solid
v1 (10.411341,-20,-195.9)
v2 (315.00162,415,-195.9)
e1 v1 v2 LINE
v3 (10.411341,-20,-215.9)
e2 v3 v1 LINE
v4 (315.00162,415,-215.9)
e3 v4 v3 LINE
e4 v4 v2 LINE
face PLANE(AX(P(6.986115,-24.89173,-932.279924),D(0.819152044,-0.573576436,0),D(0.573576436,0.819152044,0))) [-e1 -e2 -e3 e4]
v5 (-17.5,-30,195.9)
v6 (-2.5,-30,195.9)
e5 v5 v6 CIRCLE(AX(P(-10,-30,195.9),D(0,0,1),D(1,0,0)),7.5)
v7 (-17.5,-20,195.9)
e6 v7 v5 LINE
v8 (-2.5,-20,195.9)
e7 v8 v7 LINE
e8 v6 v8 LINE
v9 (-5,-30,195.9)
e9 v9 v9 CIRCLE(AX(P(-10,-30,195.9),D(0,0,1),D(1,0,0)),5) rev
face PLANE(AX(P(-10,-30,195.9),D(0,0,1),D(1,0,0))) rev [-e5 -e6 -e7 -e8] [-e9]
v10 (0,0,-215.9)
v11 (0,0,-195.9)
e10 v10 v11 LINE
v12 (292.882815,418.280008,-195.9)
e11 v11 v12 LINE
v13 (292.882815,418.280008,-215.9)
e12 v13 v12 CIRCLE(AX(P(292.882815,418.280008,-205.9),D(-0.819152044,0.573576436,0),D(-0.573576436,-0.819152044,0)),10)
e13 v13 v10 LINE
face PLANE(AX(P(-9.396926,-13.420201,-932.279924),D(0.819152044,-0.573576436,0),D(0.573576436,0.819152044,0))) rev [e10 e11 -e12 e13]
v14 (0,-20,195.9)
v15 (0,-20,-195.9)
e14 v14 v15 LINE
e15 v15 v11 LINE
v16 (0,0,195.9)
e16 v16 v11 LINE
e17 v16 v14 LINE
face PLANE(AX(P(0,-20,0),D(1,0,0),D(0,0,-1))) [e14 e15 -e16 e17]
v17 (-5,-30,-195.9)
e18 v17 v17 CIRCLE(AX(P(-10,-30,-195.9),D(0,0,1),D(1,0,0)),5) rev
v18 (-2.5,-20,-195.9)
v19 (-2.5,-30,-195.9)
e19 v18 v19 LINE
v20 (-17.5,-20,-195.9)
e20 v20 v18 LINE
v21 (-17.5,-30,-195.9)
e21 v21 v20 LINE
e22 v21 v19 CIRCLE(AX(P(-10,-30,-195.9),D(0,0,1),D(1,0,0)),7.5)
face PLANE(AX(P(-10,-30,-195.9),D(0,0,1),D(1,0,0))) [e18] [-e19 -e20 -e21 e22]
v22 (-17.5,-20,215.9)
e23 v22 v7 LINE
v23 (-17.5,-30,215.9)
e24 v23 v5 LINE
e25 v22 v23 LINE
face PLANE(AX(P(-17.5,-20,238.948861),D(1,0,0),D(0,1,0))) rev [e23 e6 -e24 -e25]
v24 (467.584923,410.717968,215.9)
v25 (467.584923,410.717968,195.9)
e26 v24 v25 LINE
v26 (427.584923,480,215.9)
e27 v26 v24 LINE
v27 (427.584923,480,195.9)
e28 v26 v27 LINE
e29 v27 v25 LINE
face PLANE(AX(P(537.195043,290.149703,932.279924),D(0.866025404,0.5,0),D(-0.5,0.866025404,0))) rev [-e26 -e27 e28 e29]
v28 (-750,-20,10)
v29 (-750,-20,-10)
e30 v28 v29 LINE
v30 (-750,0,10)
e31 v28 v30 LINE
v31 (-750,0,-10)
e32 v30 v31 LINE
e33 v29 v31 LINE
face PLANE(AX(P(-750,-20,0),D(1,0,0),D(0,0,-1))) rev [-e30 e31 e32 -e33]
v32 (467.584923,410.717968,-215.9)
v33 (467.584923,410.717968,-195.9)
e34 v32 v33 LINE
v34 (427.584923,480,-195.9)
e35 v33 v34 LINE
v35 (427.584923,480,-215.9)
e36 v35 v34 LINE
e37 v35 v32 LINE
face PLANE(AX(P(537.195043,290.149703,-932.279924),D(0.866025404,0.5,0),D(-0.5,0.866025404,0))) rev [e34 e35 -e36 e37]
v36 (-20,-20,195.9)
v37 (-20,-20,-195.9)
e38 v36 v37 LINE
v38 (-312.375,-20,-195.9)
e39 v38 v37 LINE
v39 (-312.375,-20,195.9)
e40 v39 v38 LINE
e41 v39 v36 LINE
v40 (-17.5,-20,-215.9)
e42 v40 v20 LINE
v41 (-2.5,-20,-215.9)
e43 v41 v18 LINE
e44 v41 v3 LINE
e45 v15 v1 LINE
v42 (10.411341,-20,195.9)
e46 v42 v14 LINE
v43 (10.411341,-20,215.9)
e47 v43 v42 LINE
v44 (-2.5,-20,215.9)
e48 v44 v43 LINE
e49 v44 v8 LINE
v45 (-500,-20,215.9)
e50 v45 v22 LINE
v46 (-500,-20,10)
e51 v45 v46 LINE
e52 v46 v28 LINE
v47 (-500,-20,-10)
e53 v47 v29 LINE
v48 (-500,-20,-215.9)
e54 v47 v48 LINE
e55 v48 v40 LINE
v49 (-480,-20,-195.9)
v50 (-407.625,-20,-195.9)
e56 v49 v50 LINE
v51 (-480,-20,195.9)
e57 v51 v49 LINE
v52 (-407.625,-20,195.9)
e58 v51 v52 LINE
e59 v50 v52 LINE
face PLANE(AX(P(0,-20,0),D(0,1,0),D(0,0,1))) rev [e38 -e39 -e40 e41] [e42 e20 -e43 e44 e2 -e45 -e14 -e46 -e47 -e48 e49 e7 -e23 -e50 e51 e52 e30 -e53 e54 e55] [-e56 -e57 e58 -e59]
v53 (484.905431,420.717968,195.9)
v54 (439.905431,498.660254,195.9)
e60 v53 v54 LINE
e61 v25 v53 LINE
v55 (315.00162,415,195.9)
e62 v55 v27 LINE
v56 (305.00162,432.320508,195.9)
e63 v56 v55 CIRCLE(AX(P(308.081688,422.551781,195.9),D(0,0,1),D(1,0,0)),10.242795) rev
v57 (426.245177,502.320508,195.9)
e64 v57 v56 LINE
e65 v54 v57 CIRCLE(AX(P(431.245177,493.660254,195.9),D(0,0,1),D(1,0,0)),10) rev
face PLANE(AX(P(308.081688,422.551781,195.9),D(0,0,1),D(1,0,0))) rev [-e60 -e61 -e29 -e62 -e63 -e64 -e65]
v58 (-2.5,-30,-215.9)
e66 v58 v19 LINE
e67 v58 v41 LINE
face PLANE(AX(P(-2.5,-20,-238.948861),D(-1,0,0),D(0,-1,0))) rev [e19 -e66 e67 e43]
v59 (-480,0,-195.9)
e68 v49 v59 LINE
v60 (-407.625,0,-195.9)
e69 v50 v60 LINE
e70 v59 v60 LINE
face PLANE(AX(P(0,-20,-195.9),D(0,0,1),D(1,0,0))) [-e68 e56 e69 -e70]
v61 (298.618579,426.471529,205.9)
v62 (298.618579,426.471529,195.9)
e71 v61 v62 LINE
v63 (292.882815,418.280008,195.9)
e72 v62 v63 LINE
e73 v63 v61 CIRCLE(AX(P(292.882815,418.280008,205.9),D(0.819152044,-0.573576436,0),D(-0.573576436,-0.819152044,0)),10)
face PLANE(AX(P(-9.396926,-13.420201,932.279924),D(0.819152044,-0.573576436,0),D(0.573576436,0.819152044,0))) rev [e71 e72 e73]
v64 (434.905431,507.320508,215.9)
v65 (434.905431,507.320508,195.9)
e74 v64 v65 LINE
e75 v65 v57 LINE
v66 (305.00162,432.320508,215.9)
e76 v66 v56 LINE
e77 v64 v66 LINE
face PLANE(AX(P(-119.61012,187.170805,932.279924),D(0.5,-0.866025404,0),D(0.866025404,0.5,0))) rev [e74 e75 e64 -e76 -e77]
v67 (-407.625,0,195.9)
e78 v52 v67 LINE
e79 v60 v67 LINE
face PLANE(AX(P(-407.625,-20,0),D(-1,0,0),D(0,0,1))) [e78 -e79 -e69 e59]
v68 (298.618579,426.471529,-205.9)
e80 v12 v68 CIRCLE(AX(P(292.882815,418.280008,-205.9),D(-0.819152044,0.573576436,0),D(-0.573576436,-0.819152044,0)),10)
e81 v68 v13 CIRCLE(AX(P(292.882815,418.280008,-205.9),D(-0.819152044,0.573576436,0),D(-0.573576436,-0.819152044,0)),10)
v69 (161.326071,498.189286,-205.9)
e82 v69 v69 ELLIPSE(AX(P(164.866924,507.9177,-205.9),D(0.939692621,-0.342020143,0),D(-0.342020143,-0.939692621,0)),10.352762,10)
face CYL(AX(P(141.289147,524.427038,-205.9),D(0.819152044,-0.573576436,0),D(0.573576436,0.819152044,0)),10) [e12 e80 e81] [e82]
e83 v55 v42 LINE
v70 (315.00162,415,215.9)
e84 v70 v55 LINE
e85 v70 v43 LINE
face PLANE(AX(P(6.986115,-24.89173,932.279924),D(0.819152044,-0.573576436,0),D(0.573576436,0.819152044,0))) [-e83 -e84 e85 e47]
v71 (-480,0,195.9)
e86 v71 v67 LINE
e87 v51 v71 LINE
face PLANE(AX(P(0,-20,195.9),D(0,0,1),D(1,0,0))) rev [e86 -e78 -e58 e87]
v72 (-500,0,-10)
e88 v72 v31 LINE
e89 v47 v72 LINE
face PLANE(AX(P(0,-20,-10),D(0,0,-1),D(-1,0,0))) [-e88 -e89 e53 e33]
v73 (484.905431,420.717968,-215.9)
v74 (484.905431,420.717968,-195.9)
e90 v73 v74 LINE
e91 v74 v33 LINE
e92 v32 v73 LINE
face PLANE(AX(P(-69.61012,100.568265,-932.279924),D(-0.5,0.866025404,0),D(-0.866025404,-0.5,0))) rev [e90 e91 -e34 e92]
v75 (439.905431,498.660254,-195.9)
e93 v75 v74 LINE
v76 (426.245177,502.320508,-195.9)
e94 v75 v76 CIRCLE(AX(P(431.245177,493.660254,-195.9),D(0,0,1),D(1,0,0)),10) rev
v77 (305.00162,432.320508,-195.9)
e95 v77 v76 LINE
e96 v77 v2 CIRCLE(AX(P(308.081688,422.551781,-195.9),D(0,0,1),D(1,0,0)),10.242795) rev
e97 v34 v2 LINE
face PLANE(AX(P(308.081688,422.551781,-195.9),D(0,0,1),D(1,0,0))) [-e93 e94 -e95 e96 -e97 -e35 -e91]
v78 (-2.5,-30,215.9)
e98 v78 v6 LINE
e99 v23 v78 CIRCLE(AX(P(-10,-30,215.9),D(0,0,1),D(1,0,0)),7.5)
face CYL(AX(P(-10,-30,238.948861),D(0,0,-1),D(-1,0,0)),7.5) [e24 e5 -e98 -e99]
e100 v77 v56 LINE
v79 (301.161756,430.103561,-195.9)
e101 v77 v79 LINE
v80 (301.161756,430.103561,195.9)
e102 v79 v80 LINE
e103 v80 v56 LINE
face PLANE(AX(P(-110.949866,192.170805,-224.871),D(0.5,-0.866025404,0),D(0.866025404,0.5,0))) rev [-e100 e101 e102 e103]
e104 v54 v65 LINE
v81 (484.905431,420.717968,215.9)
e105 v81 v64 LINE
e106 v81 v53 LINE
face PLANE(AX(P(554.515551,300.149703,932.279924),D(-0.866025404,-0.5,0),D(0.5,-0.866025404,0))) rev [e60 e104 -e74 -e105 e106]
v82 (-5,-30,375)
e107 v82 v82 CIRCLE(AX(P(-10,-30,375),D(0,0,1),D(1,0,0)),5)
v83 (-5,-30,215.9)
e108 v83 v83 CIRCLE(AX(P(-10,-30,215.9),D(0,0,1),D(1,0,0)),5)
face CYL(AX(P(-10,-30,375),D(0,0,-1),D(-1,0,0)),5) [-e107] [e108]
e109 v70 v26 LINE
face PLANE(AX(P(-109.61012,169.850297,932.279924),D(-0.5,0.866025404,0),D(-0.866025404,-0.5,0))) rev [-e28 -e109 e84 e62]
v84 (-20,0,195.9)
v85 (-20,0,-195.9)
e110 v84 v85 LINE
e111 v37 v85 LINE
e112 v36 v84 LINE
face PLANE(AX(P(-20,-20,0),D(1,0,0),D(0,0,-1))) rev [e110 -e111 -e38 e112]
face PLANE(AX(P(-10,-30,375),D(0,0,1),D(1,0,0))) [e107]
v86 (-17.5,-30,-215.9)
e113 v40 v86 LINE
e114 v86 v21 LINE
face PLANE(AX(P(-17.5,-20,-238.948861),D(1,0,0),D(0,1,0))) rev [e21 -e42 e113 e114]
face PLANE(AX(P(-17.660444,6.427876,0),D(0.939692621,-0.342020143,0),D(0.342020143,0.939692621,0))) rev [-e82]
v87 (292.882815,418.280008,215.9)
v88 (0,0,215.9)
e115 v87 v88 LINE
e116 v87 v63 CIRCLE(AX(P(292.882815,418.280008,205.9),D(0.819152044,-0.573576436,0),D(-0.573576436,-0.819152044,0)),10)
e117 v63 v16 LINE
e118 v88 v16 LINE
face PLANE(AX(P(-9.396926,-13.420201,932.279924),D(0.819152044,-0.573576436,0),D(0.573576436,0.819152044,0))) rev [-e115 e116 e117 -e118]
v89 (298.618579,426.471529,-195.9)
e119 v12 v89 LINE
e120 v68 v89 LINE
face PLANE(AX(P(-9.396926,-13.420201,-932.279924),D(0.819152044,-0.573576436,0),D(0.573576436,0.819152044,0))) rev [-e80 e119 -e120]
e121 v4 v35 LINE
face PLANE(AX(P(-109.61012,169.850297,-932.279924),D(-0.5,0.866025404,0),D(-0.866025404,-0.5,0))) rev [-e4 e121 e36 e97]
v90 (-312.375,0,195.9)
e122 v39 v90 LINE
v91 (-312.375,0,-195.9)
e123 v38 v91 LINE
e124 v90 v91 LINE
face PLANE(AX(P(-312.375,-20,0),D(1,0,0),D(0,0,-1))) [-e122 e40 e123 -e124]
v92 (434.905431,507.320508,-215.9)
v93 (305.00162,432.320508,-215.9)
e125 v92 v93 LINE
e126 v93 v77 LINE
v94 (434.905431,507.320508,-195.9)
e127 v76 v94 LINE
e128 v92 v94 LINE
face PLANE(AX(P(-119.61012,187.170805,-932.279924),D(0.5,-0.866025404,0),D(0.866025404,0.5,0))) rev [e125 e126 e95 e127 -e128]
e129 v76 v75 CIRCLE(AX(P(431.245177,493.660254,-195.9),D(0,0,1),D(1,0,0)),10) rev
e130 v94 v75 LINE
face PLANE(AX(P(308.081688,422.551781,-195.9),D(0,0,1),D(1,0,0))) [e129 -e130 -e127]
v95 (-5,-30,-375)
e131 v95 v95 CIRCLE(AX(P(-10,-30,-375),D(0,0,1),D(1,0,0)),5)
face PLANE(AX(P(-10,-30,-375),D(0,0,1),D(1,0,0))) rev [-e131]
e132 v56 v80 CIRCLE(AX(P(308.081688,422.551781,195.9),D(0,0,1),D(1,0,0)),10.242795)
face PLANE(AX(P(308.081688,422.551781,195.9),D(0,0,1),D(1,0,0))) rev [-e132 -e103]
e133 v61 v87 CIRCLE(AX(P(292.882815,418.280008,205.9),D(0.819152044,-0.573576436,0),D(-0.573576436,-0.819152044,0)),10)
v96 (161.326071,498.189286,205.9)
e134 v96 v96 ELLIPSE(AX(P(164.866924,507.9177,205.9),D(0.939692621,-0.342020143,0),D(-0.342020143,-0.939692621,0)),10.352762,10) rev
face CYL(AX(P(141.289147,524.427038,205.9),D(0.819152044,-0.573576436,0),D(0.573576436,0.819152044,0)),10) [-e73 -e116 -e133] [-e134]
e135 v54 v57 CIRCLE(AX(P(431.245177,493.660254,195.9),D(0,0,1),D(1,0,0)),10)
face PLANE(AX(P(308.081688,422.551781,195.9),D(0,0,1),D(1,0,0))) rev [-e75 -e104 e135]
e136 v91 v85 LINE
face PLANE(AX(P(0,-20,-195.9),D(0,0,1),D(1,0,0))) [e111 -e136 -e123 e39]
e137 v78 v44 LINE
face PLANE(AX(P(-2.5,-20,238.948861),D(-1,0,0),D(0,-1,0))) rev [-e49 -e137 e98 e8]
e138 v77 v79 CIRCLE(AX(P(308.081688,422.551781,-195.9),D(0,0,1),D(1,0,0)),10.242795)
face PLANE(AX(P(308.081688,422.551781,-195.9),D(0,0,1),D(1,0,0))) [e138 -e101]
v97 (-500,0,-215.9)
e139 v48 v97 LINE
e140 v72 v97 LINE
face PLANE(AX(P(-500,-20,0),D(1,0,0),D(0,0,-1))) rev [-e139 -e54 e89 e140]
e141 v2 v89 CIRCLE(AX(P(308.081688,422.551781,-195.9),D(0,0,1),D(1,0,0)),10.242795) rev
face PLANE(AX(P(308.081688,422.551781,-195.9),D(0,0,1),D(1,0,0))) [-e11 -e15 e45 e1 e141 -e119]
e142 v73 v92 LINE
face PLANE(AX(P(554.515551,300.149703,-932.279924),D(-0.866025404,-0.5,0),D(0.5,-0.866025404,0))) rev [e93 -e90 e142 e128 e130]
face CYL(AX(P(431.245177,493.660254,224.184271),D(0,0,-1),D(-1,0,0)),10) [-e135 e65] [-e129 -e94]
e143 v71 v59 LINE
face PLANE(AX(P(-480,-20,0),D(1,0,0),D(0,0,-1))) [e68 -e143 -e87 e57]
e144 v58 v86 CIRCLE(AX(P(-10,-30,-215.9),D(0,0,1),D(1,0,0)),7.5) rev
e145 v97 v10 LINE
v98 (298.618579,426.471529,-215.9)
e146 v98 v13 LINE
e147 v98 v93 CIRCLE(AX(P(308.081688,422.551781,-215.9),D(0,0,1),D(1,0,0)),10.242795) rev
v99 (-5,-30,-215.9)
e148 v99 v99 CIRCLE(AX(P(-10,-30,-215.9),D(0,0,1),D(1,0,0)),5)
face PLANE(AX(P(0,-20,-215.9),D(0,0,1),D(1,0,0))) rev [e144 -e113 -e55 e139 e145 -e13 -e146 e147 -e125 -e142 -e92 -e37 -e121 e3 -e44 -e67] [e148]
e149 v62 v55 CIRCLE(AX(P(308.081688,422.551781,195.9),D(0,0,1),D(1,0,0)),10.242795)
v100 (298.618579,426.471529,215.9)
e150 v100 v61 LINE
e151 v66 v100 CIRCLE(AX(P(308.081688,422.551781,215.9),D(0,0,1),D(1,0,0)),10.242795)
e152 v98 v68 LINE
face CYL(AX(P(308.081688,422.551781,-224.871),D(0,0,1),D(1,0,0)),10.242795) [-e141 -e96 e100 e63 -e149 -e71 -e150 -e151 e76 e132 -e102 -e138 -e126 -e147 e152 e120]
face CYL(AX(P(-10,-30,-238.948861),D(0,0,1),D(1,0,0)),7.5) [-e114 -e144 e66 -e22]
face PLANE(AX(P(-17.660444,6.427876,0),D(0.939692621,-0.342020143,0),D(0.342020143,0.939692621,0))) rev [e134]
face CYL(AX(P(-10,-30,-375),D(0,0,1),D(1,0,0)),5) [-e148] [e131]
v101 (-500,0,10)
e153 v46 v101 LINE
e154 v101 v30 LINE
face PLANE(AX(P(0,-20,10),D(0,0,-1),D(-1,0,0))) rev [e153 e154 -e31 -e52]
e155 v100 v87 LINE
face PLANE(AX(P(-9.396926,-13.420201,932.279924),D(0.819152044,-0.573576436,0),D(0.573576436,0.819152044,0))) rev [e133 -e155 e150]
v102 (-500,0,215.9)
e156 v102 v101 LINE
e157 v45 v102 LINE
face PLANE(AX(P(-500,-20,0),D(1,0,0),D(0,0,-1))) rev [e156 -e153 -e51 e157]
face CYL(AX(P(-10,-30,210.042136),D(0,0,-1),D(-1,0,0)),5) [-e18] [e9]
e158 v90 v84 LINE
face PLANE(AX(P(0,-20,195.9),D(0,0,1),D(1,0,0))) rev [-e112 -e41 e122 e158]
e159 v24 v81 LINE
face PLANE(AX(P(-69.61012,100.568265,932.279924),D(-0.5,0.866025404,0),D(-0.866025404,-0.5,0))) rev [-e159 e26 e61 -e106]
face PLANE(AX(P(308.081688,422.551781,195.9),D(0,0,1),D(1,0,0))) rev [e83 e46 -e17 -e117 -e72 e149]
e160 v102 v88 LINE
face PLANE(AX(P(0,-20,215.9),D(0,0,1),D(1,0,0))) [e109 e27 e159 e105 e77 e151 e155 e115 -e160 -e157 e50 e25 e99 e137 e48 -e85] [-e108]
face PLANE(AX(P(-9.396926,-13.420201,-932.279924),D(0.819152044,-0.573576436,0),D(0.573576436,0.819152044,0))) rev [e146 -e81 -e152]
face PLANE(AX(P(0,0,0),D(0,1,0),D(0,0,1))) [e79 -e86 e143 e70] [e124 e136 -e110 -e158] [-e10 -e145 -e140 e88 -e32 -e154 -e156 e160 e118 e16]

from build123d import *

# Parameters (mm, degrees)
SKETCH6_W                       = 500
SKETCH6_H                       = 431.8
SKETCH6_W_2                     = 460
SKETCH6_H_2                     = 391.8
SKETCH6_W_3                     = 95.25
SKETCH6_W_4                     = 250
SKETCH6_H_3                     = 20
BOSS_EXTRUDE2_DEPTH             = 20
BOSS_EXTRUDE6_START             = -195.9
SKETCH8_R                       = 5
BOSS_EXTRUDE6_DEPTH             = 20
BOSS_EXTRUDE7_START             = 215.9
SKETCH8_6_R                     = 5
BOSS_EXTRUDE7_DEPTH             = 20
BOSS_EXTRUDE8_REACH             = 783.357
SKETCH8_7_R                     = 5
BOSS_EXTRUDE8_DIRECTION_2_REACH = 783.357
BOSS_EXTRUDE9_START             = -195.9
BOSS_EXTRUDE9_DEPTH             = 20
BOSS_EXTRUDE10_START            = 195.9
BOSS_EXTRUDE10_DEPTH            = 20
BOSS_EXTRUDE11_START            = 179.1
SKETCH8_8_R                     = 5
BOSS_EXTRUDE11_DEPTH            = 195.9
BOSS_EXTRUDE12_START            = -375
SKETCH8_9_R                     = 5
BOSS_EXTRUDE12_DEPTH            = 195.9
BOSS_EXTRUDE13_START            = -195.9
BOSS_EXTRUDE13_DEPTH            = 391.8
BOSS_EXTRUDE14_START            = -195.9
BOSS_EXTRUDE14_DEPTH            = 391.8
BOSS_EXTRUDE15_START            = -195.9
SKETCH9_6_R                     = 10
BOSS_EXTRUDE15_DEPTH            = 391.8
BOSS_EXTRUDE16_REACH            = 982.051
SKETCH10_R                      = 10


# Read off the part's stored shape, not the designer's step: Boss-Extrude10, Boss-Extrude14
with BuildPart() as part:
    # Sketch6 → Boss-Extrude2 (new body)
    # profile 1 of 3: a face of its own
    with BuildSketch(Plane(origin=(0, 0, 0), x_dir=(1, 0, 0), z_dir=(0, 1, 0))):
        with Locations((-250, 0)):
            Rectangle(SKETCH6_W, SKETCH6_H)
        with Locations((-250, 0)):
            Rectangle(SKETCH6_W_2, SKETCH6_H_2, mode=Mode.SUBTRACT)
    # profile 2 of 3: a face of its own
    with BuildSketch(Plane(origin=(0, 0, 0), x_dir=(1, 0, 0), z_dir=(0, 1, 0))):
        with Locations((-360, 0)):
            Rectangle(SKETCH6_W_3, SKETCH6_H_2)
    # profile 3 of 3: a face of its own
    with BuildSketch(Plane(origin=(0, 0, 0), x_dir=(1, 0, 0), z_dir=(0, 1, 0))):
        with Locations((-625, 0)):
            Rectangle(SKETCH6_W_4, SKETCH6_H_3)
    extrude(amount=-BOSS_EXTRUDE2_DEPTH)

    # Sketch8 → Boss-Extrude6 (add)
    # profile 1 of 2: a face of its own
    with BuildSketch(Plane.XY.offset(BOSS_EXTRUDE6_START)):
        with BuildLine():
            Line((-2.5, -30), (-2.5, -20))
            Line((-2.5, -20), (-17.5, -20))
            Line((-17.5, -20), (-17.5, -30))
            ThreePointArc((-17.5, -30), (-10, -37.5), (-2.5, -30))
        make_face()
        with Locations((-10, -30)):
            Circle(SKETCH8_R, mode=Mode.SUBTRACT)
    # profile 2 of 2: a face of its own
    with BuildSketch(Plane.XY.offset(BOSS_EXTRUDE6_START)):
        with Locations((-10, -30)):
            Circle(SKETCH8_R)
    extrude(amount=-BOSS_EXTRUDE6_DEPTH)

    # Sketch8<6> → Boss-Extrude7 (add)
    # profile 1 of 2: a face of its own
    with BuildSketch(Plane.XY.offset(BOSS_EXTRUDE7_START)):
        with BuildLine():
            Line((-2.5, -30), (-2.5, -20))
            Line((-2.5, -20), (-17.5, -20))
            Line((-17.5, -20), (-17.5, -30))
            ThreePointArc((-17.5, -30), (-10, -37.5), (-2.5, -30))
        make_face()
        with Locations((-10, -30)):
            Circle(SKETCH8_6_R, mode=Mode.SUBTRACT)
    # profile 2 of 2: a face of its own
    with BuildSketch(Plane.XY.offset(BOSS_EXTRUDE7_START)):
        with Locations((-10, -30)):
            Circle(SKETCH8_6_R)
    extrude(amount=-BOSS_EXTRUDE7_DEPTH)

    # Boss-Extrude8: up to this face of the body (flat: up to its plane)
    boss_extrude8_end = Plane(part.part.faces().sort_by_distance((-166.1875, -10, 195.9))[0])
    # Sketch8<7> → Boss-Extrude8 (add, up to the picked face)
    with BuildSketch(Plane.XY, mode=Mode.PRIVATE) as boss_extrude8_sk1:
        with Locations((-10, -30)):
            Circle(SKETCH8_7_R)
    boss_extrude8_tool1 = split(extrude(boss_extrude8_sk1.sketch, amount=BOSS_EXTRUDE8_REACH, mode=Mode.PRIVATE), bisect_by=boss_extrude8_end, keep=Keep.BOTH, mode=Mode.PRIVATE)
    add(boss_extrude8_tool1.solids().sort_by(Axis((-10, -30, 0), (0, 0, 1)))[0])

    # Boss-Extrude8 direction 2: up to this face of the body (flat: up to its plane)
    boss_extrude8_direction_2_end = Plane(part.part.faces().sort_by_distance((-443.8125, -10, -195.9))[0])
    # Sketch8<7> → Boss-Extrude8 direction 2 (add, up to the picked face)
    with BuildSketch(Plane.XY, mode=Mode.PRIVATE) as boss_extrude8_direction_2_sk1:
        with Locations((-10, -30)):
            Circle(SKETCH8_7_R)
    boss_extrude8_direction_2_tool1 = split(extrude(boss_extrude8_direction_2_sk1.sketch, amount=-BOSS_EXTRUDE8_DIRECTION_2_REACH, mode=Mode.PRIVATE), bisect_by=boss_extrude8_direction_2_end, keep=Keep.BOTH, mode=Mode.PRIVATE)
    add(boss_extrude8_direction_2_tool1.solids().sort_by(Axis((-10, -30, 0), (0, 0, -1)))[0])

    # Sketch9 → Boss-Extrude9 (add)
    with BuildSketch(Plane.XY.offset(BOSS_EXTRUDE9_START)):
        with BuildLine():
            Line((298.618579246, 426.471528727), (0, 0))
            Line((0, 0), (0, -20))
            Line((0, -20), (10.411341011, -20))
            Line((10.411341011, -20), (315.001620132, 415))
            Line((315.001620132, 415), (427.584922624, 480))
            Line((427.584922624, 480), (467.584922624, 410.717967697))
            Line((467.584922624, 410.717967697), (484.9054307, 420.717967697))
            Line((484.9054307, 420.717967697), (434.9054307, 507.320508076))
            Line((434.9054307, 507.320508076), (305.001620132, 432.320508076))
            ThreePointArc((305.001620132, 432.320508076), (301.161755938, 430.103561449), (298.618579246, 426.471528727))
        make_face()
    extrude(amount=-BOSS_EXTRUDE9_DEPTH)

    # Boss-Extrude10 outline → Boss-Extrude10 (add)
    with BuildSketch(Plane.XY.offset(BOSS_EXTRUDE10_START)):
        with BuildLine():
            Line((434.9054307, 507.320508076), (305.001620132, 432.320508076))
            ThreePointArc((305.001620132, 432.320508076), (301.161755938, 430.103561449), (298.618579246, 426.471528727))
            Line((298.618579246, 426.471528727), (0, 0))
            Line((0, 0), (0, -20))
            Line((0, -20), (10.411341011, -20))
            Line((10.411341011, -20), (315.001620132, 415))
            Line((315.001620132, 415), (427.584922624, 480))
            Line((427.584922624, 480), (467.584922624, 410.717967697))
            Line((467.584922624, 410.717967697), (484.9054307, 420.717967697))
            Line((484.9054307, 420.717967697), (434.9054307, 507.320508076))
        make_face()
    extrude(amount=BOSS_EXTRUDE10_DEPTH)

    # Sketch8<8> → Boss-Extrude11 (add)
    with BuildSketch(Plane.XY.offset(BOSS_EXTRUDE11_START)):
        with Locations((-10, -30)):
            Circle(SKETCH8_8_R)
    extrude(amount=BOSS_EXTRUDE11_DEPTH)

    # Sketch8<9> → Boss-Extrude12 (add)
    with BuildSketch(Plane.XY.offset(BOSS_EXTRUDE12_START)):
        with Locations((-10, -30)):
            Circle(SKETCH8_9_R)
    extrude(amount=BOSS_EXTRUDE12_DEPTH)

    # Boss-Extrude14 outline → Boss-Extrude14 (add)
    with BuildSketch(Plane.XY.offset(BOSS_EXTRUDE14_START)):
        with BuildLine():
            ThreePointArc((301.161755938, 430.103561449), (313.203085607, 413.681259926), (305.001620132, 432.320508076))
            Line((305.001620132, 432.320508076), (301.161755938, 430.103561449))
        make_face()
    extrude(amount=BOSS_EXTRUDE14_DEPTH)

    # Sketch9<6> → Boss-Extrude15 (add)
    with BuildSketch(Plane.XY.offset(BOSS_EXTRUDE15_START)):
        with Locations(Location((431.245176662, 493.660254038, 0), (0, 0, 120))):
            Circle(SKETCH9_6_R)
    extrude(amount=BOSS_EXTRUDE15_DEPTH)


with BuildPart() as body_2:
    # Sketch9<4> → Boss-Extrude13 (new body)
    with BuildSketch(Plane.XY.offset(BOSS_EXTRUDE13_START)):
        with BuildLine():
            Line((301.161755938, 430.103561449), (298.618579246, 426.471528727))
            ThreePointArc((298.618579246, 426.471528727), (302.206662098, 414.161374144), (315.001620132, 415))
            ThreePointArc((315.001620132, 415), (317.457036008, 418.426528886), (318.324483178, 422.551780725))
            ThreePointArc((318.324483178, 422.551780725), (314.138351629, 430.8120276), (305.001620132, 432.320508076))
            Line((305.001620132, 432.320508076), (301.161755938, 430.103561449))
        make_face()
    extrude(amount=BOSS_EXTRUDE13_DEPTH)


    add(part.part)  # Boss-Extrude16 merges part
    # Boss-Extrude16: up to this plane
    boss_extrude16_end = Plane(origin=(-17.660444431, 6.427876097, 0), z_dir=(0.939692620785907, -0.3420201433256725, 0))
    # Sketch10 → Boss-Extrude16 (add, up to the surface)
    with BuildSketch(Plane(origin=(0, 0, 0), x_dir=(0, 0, 1), z_dir=(-0.8191520442889914, 0.5735764363510468, 0)), mode=Mode.PRIVATE) as boss_extrude16_sk1:
        with Locations(Location((-205.9, 510.6256051, 0), (0, 0, 90))):
            Circle(SKETCH10_R)
    boss_extrude16_tool1 = split(extrude(boss_extrude16_sk1.sketch, amount=BOSS_EXTRUDE16_REACH, mode=Mode.PRIVATE), bisect_by=boss_extrude16_end, keep=Keep.BOTH, mode=Mode.PRIVATE)
    boss_extrude16 = boss_extrude16_tool1.solids().sort_by_distance((292.882815, 418.280008, -205.9))[0]
    add(boss_extrude16)

    # Mirror1: Boss-Extrude16 across plane
    add(boss_extrude16.mirror(Plane.XY))


solid = body_2.part
